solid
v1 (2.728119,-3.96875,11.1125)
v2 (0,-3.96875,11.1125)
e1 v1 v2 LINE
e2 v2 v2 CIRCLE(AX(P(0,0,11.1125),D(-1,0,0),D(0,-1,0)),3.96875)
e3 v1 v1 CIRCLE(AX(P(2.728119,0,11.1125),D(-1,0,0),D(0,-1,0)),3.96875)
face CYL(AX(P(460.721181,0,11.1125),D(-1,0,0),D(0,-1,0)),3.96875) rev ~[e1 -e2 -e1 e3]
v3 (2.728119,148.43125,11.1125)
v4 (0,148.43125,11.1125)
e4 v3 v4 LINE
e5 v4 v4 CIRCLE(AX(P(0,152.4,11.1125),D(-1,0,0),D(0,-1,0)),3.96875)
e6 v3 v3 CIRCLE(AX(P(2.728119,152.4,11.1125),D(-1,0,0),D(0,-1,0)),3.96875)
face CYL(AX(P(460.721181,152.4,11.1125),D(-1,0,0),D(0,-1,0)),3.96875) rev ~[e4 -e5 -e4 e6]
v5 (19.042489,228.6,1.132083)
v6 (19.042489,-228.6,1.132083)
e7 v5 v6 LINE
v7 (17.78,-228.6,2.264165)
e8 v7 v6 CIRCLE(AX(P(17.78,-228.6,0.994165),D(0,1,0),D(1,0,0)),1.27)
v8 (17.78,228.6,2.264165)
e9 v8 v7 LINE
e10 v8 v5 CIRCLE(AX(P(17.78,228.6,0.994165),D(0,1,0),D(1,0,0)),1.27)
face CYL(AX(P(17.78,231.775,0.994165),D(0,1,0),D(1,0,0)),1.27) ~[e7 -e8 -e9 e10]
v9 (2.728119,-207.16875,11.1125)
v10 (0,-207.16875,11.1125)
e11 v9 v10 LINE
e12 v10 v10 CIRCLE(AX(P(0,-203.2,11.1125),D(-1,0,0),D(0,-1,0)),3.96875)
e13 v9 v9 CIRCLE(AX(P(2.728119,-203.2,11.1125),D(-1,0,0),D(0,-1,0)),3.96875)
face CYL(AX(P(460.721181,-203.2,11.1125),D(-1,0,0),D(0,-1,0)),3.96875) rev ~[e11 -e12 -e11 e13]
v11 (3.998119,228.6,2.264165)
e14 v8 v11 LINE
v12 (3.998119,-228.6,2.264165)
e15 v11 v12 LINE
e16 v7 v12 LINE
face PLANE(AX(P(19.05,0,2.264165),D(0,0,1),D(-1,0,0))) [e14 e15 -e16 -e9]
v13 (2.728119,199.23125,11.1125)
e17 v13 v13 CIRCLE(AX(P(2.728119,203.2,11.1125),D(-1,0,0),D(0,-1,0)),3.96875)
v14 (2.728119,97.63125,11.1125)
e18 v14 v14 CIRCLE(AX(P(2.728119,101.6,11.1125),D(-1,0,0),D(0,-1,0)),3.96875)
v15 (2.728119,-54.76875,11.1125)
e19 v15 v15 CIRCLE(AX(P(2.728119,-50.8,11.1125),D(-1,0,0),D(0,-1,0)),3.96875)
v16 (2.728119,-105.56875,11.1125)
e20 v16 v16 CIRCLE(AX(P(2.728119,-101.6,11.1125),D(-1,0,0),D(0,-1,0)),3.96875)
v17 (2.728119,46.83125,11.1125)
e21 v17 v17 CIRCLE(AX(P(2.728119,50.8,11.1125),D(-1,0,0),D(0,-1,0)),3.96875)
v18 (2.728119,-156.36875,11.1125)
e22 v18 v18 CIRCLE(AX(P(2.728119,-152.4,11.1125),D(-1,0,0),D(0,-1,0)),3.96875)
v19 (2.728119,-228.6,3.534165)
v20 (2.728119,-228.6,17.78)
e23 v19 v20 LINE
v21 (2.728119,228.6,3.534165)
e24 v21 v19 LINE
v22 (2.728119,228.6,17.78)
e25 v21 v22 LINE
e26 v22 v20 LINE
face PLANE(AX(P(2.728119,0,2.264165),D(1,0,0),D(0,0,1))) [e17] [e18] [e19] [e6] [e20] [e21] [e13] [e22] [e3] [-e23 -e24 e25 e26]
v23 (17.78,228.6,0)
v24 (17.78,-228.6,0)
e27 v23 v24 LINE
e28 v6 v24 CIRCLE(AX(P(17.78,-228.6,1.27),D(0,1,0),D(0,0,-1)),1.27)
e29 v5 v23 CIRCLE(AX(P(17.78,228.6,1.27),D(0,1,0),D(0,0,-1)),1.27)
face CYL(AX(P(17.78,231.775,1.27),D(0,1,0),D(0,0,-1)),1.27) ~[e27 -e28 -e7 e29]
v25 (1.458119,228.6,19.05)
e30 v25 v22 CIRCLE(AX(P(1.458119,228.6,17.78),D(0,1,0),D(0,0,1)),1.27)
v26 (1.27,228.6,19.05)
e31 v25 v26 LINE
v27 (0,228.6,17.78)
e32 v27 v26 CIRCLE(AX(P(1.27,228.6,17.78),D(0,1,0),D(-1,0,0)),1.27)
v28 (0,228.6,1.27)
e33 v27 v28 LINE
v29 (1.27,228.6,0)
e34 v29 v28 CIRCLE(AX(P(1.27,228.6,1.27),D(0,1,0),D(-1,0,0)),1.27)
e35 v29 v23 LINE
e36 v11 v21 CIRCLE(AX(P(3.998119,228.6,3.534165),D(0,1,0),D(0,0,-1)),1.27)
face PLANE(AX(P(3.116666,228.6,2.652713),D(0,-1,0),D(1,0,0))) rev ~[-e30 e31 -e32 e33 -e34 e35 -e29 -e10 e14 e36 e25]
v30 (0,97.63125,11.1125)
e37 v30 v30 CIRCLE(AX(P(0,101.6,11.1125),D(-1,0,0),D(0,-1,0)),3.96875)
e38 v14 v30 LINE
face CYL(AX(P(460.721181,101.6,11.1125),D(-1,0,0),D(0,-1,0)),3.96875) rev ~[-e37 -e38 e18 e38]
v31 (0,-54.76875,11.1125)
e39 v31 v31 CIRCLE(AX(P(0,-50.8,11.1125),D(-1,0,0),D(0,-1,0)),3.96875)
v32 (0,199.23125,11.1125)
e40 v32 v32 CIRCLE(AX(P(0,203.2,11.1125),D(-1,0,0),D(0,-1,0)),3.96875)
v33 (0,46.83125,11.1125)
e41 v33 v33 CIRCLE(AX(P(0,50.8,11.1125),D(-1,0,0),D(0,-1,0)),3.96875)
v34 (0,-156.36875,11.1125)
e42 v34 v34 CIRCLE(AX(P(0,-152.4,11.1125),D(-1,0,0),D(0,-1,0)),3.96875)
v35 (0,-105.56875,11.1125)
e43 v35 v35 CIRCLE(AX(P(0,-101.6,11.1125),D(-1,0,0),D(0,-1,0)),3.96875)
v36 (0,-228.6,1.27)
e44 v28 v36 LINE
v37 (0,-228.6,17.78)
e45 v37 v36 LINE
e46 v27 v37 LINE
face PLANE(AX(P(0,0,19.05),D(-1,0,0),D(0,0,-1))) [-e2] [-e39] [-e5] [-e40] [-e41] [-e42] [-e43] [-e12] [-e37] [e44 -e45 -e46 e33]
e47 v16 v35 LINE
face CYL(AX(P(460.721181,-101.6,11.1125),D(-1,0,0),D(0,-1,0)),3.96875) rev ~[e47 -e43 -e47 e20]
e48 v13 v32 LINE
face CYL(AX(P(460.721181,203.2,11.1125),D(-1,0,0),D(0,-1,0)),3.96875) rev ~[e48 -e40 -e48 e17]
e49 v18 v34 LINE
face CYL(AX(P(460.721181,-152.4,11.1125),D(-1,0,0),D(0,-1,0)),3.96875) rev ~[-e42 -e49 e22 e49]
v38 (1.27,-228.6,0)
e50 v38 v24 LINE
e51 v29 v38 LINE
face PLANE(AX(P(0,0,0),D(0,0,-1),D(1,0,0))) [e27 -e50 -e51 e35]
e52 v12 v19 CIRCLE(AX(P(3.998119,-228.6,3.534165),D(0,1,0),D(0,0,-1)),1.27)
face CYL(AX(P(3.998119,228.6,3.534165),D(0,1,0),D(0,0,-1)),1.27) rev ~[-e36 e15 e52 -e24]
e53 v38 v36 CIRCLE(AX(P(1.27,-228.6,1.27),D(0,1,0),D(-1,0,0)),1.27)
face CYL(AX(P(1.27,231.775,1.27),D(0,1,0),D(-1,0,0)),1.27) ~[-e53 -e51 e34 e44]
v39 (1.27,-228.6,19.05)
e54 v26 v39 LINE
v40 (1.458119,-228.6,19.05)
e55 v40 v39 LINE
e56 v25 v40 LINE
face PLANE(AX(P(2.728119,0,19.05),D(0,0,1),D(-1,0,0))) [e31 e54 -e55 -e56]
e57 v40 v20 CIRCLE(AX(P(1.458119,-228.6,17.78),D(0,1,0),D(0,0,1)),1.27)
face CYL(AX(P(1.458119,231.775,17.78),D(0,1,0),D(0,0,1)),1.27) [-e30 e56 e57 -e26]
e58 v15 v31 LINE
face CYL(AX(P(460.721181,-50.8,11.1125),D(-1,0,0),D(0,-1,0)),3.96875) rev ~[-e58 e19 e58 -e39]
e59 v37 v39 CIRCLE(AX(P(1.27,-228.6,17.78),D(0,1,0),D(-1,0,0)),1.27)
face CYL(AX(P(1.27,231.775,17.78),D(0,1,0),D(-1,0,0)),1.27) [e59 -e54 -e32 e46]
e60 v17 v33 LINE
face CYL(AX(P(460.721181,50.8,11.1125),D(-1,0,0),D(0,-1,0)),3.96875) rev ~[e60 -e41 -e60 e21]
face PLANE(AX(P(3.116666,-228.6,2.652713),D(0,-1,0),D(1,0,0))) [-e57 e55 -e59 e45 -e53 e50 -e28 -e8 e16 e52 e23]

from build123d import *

# Parameters (mm, degrees)
F1_DEPTH    = 228.6
F3_D        = 7.9375
F4_T1_DEPTH = 457.2
F4_T3_DEPTH = 463.55


# Not quite as in the source:
# - a fillet or chamfer that OpenCascade refuses, or shapes differently, is made with other operations: its cross-section is extruded or revolved along the edge and cut away or added


with BuildPart() as f1:
    # F0 (on Front) → F1 (new body, symmetric)
    with BuildSketch(Plane.XZ):
        Polygon((0, 2.264165209), (0, 0), (2.7281190167, 0), (19.05, 0), (19.05, 2.264165209), (2.7281190167, 2.264165209), (2.7281190167, 19.05), (0, 19.05), align=None)
    extrude(amount=F1_DEPTH, both=True)

    # F3 (through all)
    with Locations(Plane.YZ.offset(2.7281190167)):
        with Locations((-203.2, 11.1125), (-152.4, 11.1125), (-101.6, 11.1125), (-50.8, 11.1125), (101.6, 11.1125), (50.8, 11.1125), (0, 11.1125), (152.4, 11.1125), (203.2, 11.1125)):
            Hole(F3_D / 2)

    # F4: fillet of radius 1.27 on 6 edges, made by hand

    # F4_s2 → F4_t1 (join)
    with BuildSketch(Plane.XZ.offset(-228.6)):
        with BuildLine():
            ThreePointArc((3.9981190167, 2.264165209), (3.1000934046, 2.6361395969), (2.7281190167, 3.534165209))
            Line((2.7281190167, 3.534165209), (2.7281190167, 2.264165209))
            Line((2.7281190167, 2.264165209), (3.9981190167, 2.264165209))
        make_face()
    extrude(amount=F4_T1_DEPTH)

    # F4_s4 → F4_t3 (cut)
    with BuildSketch(Plane.XZ.offset(-231.775)):
        with BuildLine():
            ThreePointArc((0, 17.78), (0.3719743879, 18.6780256121), (1.27, 19.05))
            Line((1.27, 19.05), (0, 19.05))
            Line((0, 19.05), (0, 17.78))
        make_face()
        with BuildLine():
            ThreePointArc((1.4581190167, 19.05), (2.3561446288, 18.6780256121), (2.7281190167, 17.78))
            Line((2.7281190167, 17.78), (2.7281190167, 19.05))
            Line((2.7281190167, 19.05), (1.4581190167, 19.05))
        make_face()
        with BuildLine():
            ThreePointArc((19.05, 0.994165209), (18.6780256121, 1.8921908211), (17.78, 2.264165209))
            Line((17.78, 2.264165209), (19.05, 2.264165209))
            Line((19.05, 2.264165209), (19.05, 0.994165209))
        make_face()
        with BuildLine():
            ThreePointArc((17.78, 0), (18.6780256121, 0.3719743879), (19.05, 1.27))
            Line((19.05, 1.27), (19.05, 0))
            Line((19.05, 0), (17.78, 0))
        make_face()
        with BuildLine():
            ThreePointArc((0, 1.27), (0.3719743879, 0.3719743879), (1.27, 0))
            Line((1.27, 0), (0, 0))
            Line((0, 0), (0, 1.27))
        make_face()
    extrude(amount=F4_T3_DEPTH, mode=Mode.SUBTRACT)


solid = f1.part
